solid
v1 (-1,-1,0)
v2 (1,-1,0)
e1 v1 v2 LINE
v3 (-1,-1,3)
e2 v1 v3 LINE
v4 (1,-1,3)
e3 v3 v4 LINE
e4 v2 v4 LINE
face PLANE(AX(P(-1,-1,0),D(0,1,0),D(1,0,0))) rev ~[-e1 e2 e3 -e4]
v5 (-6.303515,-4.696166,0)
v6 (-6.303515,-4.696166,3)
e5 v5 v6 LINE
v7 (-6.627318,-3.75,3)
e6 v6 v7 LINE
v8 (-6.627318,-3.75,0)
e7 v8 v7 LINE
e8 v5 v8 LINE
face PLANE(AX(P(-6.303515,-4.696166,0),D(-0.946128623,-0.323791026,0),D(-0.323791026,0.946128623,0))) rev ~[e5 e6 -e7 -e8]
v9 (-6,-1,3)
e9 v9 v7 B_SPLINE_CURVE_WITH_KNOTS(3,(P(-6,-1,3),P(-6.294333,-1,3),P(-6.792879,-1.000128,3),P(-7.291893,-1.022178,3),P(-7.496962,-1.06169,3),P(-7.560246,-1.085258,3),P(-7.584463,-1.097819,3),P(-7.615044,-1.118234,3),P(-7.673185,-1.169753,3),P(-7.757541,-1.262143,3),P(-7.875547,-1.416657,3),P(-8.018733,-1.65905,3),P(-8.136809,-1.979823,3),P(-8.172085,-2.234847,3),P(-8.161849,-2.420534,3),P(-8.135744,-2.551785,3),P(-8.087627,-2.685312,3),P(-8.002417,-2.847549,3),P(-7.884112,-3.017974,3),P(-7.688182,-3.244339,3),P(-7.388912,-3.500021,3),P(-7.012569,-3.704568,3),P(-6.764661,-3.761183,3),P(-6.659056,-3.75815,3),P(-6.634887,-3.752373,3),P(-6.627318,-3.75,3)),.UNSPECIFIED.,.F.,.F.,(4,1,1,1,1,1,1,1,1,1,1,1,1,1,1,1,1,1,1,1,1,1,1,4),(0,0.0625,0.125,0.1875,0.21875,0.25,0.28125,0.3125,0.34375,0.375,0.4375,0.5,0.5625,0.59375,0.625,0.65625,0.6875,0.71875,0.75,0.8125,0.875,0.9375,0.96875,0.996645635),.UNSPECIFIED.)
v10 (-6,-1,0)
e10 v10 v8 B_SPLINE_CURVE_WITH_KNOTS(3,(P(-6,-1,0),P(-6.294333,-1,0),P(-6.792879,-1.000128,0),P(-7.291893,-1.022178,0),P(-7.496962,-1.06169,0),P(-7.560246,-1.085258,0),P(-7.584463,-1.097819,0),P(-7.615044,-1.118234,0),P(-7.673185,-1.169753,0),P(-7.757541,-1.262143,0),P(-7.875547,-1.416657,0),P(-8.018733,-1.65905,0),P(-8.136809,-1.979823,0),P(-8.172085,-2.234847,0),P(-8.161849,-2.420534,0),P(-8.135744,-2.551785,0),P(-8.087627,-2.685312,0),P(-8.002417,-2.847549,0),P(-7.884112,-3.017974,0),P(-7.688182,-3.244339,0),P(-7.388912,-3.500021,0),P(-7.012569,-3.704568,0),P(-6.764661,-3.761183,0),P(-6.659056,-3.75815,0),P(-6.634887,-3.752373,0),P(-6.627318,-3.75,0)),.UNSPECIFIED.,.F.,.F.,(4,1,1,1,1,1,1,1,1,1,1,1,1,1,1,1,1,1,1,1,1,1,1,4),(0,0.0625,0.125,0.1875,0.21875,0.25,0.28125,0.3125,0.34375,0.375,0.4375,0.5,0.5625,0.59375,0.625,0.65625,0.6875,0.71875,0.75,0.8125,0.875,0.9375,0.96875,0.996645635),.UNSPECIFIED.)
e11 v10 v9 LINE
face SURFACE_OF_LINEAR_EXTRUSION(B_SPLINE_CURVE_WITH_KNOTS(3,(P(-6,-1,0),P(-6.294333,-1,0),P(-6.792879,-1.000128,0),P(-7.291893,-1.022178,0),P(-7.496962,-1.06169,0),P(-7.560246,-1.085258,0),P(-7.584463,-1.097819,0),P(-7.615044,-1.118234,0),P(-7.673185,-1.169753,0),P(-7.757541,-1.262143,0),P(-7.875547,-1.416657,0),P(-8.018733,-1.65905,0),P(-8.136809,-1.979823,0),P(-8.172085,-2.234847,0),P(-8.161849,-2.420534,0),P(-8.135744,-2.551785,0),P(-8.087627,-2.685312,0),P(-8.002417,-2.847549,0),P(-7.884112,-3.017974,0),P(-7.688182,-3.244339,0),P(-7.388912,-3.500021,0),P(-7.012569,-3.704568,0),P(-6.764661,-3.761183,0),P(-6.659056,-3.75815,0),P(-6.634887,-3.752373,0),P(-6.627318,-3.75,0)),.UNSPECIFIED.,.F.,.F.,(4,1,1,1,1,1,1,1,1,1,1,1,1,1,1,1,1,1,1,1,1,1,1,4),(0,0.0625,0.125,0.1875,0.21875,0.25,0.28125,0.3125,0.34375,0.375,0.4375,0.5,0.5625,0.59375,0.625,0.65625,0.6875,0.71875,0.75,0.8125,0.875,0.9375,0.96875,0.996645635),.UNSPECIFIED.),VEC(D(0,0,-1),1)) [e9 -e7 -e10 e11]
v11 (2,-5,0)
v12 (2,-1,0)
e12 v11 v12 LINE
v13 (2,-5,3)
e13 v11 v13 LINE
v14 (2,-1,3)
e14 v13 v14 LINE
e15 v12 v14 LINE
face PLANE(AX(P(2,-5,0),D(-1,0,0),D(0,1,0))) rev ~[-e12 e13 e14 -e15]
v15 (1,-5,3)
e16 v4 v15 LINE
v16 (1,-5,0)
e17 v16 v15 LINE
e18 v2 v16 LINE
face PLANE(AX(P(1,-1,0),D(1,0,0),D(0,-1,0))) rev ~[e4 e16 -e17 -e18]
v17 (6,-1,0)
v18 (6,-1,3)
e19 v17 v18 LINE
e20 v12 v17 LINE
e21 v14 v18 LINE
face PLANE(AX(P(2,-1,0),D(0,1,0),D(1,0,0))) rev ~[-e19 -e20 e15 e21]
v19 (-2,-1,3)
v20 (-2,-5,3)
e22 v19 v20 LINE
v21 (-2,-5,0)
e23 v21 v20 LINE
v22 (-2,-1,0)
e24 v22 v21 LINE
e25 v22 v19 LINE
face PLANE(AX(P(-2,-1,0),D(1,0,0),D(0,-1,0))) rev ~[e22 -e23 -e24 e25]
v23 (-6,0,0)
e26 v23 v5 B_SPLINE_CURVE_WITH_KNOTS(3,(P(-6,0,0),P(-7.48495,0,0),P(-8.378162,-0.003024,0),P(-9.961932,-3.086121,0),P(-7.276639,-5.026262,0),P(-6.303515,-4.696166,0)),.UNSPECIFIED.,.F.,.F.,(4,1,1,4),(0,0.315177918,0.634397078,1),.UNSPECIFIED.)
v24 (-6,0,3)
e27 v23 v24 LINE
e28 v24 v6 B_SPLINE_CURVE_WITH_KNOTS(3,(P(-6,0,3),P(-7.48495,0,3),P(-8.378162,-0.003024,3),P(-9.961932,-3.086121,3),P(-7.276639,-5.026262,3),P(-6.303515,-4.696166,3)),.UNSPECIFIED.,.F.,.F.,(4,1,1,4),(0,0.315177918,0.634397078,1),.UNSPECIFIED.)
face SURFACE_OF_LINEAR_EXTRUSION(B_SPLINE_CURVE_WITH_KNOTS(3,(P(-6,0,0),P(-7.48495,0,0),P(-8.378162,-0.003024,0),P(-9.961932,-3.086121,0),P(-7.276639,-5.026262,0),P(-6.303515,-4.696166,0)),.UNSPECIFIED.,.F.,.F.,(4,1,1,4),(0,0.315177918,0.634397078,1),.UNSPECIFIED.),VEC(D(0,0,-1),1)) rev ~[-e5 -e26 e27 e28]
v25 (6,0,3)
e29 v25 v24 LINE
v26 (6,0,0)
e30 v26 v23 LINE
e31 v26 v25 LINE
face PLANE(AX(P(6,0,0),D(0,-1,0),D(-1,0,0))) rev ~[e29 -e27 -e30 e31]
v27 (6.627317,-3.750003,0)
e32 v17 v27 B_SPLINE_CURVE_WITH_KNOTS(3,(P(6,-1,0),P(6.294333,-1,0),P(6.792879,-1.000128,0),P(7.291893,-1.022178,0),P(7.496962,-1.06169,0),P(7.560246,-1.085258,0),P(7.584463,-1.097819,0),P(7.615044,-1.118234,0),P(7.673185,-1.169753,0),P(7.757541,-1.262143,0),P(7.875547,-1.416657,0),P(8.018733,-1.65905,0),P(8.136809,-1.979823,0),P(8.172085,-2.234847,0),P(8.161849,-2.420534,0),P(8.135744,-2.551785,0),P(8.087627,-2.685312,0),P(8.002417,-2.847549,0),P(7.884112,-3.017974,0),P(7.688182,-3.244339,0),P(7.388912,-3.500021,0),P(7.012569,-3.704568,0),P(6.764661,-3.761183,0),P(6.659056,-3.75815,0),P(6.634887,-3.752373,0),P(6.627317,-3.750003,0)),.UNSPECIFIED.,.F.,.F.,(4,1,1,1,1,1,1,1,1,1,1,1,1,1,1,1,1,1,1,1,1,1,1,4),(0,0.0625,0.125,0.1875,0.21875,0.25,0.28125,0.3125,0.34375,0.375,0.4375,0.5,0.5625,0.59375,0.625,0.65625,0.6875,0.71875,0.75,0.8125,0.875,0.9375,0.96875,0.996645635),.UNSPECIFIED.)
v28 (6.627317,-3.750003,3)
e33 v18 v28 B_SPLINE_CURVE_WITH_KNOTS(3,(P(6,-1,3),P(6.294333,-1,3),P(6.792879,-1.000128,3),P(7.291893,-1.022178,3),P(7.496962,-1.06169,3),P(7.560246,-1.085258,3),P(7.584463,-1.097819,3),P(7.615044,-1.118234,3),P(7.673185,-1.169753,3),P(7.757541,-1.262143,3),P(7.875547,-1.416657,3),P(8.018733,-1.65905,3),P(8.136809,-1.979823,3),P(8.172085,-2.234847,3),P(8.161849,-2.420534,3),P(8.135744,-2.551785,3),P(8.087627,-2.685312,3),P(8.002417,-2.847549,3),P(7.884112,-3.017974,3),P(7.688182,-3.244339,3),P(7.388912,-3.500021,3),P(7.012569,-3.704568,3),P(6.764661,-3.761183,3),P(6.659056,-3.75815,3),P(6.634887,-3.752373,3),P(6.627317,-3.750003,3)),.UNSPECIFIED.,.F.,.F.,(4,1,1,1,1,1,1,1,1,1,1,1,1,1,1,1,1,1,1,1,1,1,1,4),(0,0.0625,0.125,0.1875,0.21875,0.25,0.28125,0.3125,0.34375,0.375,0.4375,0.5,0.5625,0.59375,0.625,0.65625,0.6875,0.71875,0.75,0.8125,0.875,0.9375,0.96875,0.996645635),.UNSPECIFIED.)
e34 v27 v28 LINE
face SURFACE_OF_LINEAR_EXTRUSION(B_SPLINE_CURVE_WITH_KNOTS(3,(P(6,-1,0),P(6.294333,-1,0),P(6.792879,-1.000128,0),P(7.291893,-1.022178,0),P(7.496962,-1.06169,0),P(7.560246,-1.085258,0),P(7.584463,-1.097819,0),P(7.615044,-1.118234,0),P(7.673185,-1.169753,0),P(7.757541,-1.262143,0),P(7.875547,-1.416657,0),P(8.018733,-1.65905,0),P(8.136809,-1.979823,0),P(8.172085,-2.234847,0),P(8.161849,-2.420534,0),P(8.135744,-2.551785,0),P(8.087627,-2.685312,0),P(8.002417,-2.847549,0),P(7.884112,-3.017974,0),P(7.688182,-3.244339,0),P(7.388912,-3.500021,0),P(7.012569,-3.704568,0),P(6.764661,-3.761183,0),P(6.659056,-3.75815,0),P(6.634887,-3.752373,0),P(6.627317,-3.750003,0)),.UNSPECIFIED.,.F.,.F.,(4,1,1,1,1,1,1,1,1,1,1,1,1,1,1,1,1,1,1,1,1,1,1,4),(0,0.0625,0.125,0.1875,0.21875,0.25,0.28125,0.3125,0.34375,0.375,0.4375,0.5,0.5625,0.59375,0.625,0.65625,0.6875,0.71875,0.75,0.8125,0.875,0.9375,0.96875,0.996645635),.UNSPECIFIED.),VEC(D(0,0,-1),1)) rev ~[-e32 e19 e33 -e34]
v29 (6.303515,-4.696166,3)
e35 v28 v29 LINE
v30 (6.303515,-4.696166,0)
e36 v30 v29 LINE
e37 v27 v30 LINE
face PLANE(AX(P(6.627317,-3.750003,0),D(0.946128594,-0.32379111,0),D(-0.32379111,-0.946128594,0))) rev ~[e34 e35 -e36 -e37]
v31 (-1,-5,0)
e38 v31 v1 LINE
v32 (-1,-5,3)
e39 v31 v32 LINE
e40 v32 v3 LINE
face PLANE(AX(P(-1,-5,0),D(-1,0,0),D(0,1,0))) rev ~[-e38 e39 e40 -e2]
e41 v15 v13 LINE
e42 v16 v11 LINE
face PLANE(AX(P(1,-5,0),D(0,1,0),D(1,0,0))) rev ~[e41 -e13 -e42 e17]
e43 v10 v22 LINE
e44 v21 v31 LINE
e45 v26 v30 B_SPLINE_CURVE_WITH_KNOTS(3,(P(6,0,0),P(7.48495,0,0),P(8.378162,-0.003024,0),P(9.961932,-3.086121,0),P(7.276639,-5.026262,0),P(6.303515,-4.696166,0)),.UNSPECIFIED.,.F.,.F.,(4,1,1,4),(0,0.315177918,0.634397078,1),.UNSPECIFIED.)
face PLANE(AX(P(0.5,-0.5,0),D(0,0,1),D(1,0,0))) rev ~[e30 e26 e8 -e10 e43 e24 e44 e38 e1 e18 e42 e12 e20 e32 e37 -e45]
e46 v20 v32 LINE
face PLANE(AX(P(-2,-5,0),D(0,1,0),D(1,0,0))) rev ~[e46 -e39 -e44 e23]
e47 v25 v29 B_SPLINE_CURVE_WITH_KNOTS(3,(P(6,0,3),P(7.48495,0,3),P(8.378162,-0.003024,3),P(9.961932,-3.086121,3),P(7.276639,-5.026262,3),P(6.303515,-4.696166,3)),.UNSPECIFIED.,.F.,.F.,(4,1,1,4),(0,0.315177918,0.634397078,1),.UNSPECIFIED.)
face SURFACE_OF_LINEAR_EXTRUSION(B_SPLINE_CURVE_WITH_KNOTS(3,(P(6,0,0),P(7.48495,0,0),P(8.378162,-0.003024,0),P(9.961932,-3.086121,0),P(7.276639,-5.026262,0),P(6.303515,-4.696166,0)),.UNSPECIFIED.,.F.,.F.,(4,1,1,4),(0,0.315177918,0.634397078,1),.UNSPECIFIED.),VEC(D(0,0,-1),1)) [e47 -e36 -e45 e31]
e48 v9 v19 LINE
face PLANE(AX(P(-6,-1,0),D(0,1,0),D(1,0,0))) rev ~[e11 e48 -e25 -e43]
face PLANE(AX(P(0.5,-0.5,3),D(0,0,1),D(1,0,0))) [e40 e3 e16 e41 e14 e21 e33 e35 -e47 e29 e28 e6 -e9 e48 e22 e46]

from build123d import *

# Parameters (mm, degrees)
F0_W     = 1
F0_H     = 1
F1_DEPTH = 3


# Not quite as in the source:
# - ends of sketch curves that miss each other by under 0.0002 mm in the source are joined
# - the dataset's text gives a spline's control points without its knots; the knots are read off the source's solid


with BuildPart() as f1:
    # F0 (on Top) → F1 (new body)
    with BuildSketch(Plane.XY):
        with Locations((0.5, -0.5)):
            Rectangle(F0_W, F0_H)
        with Locations((-0.5, -0.5)):
            Rectangle(F0_W, F0_H)
        Polygon((2, 0), (1, 0), (1, -1), (1, -5), (2, -5), (2, -1), align=None)
        Polygon((-1, -1), (-1, 0), (-2, 0), (-2, -1), (-2, -5), (-1, -5), align=None)
        with BuildLine():
            Line((6, 0), (2, 0))
            Line((2, 0), (2, -1))
            Line((2, -1), (6, -1))
            add(Edge.make_bspline(
                [(6, -1), (6.2943328716, -1), (6.7928790283, -1.0001284078), (7.2918933464, -1.0221779319), (7.4969615527, -1.0616895732), (7.56024585, -1.085258147), (7.5844634078, -1.0978186915), (7.6150443946, -1.1182344461), (7.6731849802, -1.1697526134), (7.7575411055, -1.2621427239), (7.8755473485, -1.4166571253), (8.0187330203, -1.659050071), (8.1368085957, -1.9798232644), (8.1720854573, -2.2348468695), (8.1618492839, -2.4205343228), (8.1357439574, -2.551784525), (8.0876272471, -2.6853118112), (8.0024166775, -2.8475491469), (7.8841123581, -3.0179740605), (7.6881815621, -3.2443388545), (7.3889123533, -3.5000214004), (7.0125685263, -3.7045676762), (6.7646613516, -3.7611825156), (6.6590556256, -3.7581499322), (6.6348866575, -3.7523734664), (6.6273172151, -3.7500032276)],
                knots=[0, 0, 0, 0, 0.0625, 0.125, 0.1875, 0.21875, 0.25, 0.28125, 0.3125, 0.34375, 0.375, 0.4375, 0.5, 0.5625, 0.59375, 0.625, 0.65625, 0.6875, 0.71875, 0.75, 0.8125, 0.875, 0.9375, 0.96875, 0.9966456355, 0.9966456355, 0.9966456355, 0.9966456355], degree=3))
            Line((6.6273172151, -3.7500032276), (6.3035145558, -4.6961655705))
            add(Edge.make_bspline(
                [(6, 0), (7.4849501429, 0), (8.3781624755, -0.0030244964), (9.961931742, -3.0861209791), (7.2766393676, -5.0262618498), (6.3035145558, -4.6961655705)],
                knots=[0, 0, 0, 0, 0.3151779178, 0.6343970778, 1, 1, 1, 1], degree=3))
        make_face()
        with BuildLine():
            Line((-2, -1), (-2, 0))
            Line((-2, 0), (-6, 0))
            add(Edge.make_bspline(
                [(-6, 0), (-7.4849501429, 0), (-8.3781624755, -0.0030244964), (-9.961931742, -3.0861209791), (-7.2766393676, -5.0262618498), (-6.3035145558, -4.6961655705)],
                knots=[0, 0, 0, 0, 0.3151779178, 0.6343970778, 1, 1, 1, 1], degree=3))
            Line((-6.3035145558, -4.6961655705), (-6.6273182258, -3.75))
            add(Edge.make_bspline(
                [(-6, -1), (-6.2943328716, -1), (-6.7928790283, -1.0001284078), (-7.2918933464, -1.0221779319), (-7.4969615527, -1.0616895732), (-7.56024585, -1.085258147), (-7.5844634078, -1.0978186915), (-7.6150443946, -1.1182344461), (-7.6731849802, -1.1697526134), (-7.7575411055, -1.2621427239), (-7.8755473485, -1.4166571253), (-8.0187330203, -1.659050071), (-8.1368085957, -1.9798232644), (-8.1720854573, -2.2348468695), (-8.1618492839, -2.4205343228), (-8.1357439574, -2.551784525), (-8.0876272471, -2.6853118112), (-8.0024166775, -2.8475491469), (-7.8841123581, -3.0179740605), (-7.6881815621, -3.2443388545), (-7.3889123533, -3.5000214004), (-7.0125685263, -3.7045676762), (-6.7646613516, -3.7611825156), (-6.6590556256, -3.7581499322), (-6.6348866575, -3.7523734664), (-6.6273182258, -3.75)],
                knots=[0, 0, 0, 0, 0.0625, 0.125, 0.1875, 0.21875, 0.25, 0.28125, 0.3125, 0.34375, 0.375, 0.4375, 0.5, 0.5625, 0.59375, 0.625, 0.65625, 0.6875, 0.71875, 0.75, 0.8125, 0.875, 0.9375, 0.96875, 0.9966456355, 0.9966456355, 0.9966456355, 0.9966456355], degree=3))
            Line((-6, -1), (-2, -1))
        make_face()
    extrude(amount=F1_DEPTH)


solid = f1.part
